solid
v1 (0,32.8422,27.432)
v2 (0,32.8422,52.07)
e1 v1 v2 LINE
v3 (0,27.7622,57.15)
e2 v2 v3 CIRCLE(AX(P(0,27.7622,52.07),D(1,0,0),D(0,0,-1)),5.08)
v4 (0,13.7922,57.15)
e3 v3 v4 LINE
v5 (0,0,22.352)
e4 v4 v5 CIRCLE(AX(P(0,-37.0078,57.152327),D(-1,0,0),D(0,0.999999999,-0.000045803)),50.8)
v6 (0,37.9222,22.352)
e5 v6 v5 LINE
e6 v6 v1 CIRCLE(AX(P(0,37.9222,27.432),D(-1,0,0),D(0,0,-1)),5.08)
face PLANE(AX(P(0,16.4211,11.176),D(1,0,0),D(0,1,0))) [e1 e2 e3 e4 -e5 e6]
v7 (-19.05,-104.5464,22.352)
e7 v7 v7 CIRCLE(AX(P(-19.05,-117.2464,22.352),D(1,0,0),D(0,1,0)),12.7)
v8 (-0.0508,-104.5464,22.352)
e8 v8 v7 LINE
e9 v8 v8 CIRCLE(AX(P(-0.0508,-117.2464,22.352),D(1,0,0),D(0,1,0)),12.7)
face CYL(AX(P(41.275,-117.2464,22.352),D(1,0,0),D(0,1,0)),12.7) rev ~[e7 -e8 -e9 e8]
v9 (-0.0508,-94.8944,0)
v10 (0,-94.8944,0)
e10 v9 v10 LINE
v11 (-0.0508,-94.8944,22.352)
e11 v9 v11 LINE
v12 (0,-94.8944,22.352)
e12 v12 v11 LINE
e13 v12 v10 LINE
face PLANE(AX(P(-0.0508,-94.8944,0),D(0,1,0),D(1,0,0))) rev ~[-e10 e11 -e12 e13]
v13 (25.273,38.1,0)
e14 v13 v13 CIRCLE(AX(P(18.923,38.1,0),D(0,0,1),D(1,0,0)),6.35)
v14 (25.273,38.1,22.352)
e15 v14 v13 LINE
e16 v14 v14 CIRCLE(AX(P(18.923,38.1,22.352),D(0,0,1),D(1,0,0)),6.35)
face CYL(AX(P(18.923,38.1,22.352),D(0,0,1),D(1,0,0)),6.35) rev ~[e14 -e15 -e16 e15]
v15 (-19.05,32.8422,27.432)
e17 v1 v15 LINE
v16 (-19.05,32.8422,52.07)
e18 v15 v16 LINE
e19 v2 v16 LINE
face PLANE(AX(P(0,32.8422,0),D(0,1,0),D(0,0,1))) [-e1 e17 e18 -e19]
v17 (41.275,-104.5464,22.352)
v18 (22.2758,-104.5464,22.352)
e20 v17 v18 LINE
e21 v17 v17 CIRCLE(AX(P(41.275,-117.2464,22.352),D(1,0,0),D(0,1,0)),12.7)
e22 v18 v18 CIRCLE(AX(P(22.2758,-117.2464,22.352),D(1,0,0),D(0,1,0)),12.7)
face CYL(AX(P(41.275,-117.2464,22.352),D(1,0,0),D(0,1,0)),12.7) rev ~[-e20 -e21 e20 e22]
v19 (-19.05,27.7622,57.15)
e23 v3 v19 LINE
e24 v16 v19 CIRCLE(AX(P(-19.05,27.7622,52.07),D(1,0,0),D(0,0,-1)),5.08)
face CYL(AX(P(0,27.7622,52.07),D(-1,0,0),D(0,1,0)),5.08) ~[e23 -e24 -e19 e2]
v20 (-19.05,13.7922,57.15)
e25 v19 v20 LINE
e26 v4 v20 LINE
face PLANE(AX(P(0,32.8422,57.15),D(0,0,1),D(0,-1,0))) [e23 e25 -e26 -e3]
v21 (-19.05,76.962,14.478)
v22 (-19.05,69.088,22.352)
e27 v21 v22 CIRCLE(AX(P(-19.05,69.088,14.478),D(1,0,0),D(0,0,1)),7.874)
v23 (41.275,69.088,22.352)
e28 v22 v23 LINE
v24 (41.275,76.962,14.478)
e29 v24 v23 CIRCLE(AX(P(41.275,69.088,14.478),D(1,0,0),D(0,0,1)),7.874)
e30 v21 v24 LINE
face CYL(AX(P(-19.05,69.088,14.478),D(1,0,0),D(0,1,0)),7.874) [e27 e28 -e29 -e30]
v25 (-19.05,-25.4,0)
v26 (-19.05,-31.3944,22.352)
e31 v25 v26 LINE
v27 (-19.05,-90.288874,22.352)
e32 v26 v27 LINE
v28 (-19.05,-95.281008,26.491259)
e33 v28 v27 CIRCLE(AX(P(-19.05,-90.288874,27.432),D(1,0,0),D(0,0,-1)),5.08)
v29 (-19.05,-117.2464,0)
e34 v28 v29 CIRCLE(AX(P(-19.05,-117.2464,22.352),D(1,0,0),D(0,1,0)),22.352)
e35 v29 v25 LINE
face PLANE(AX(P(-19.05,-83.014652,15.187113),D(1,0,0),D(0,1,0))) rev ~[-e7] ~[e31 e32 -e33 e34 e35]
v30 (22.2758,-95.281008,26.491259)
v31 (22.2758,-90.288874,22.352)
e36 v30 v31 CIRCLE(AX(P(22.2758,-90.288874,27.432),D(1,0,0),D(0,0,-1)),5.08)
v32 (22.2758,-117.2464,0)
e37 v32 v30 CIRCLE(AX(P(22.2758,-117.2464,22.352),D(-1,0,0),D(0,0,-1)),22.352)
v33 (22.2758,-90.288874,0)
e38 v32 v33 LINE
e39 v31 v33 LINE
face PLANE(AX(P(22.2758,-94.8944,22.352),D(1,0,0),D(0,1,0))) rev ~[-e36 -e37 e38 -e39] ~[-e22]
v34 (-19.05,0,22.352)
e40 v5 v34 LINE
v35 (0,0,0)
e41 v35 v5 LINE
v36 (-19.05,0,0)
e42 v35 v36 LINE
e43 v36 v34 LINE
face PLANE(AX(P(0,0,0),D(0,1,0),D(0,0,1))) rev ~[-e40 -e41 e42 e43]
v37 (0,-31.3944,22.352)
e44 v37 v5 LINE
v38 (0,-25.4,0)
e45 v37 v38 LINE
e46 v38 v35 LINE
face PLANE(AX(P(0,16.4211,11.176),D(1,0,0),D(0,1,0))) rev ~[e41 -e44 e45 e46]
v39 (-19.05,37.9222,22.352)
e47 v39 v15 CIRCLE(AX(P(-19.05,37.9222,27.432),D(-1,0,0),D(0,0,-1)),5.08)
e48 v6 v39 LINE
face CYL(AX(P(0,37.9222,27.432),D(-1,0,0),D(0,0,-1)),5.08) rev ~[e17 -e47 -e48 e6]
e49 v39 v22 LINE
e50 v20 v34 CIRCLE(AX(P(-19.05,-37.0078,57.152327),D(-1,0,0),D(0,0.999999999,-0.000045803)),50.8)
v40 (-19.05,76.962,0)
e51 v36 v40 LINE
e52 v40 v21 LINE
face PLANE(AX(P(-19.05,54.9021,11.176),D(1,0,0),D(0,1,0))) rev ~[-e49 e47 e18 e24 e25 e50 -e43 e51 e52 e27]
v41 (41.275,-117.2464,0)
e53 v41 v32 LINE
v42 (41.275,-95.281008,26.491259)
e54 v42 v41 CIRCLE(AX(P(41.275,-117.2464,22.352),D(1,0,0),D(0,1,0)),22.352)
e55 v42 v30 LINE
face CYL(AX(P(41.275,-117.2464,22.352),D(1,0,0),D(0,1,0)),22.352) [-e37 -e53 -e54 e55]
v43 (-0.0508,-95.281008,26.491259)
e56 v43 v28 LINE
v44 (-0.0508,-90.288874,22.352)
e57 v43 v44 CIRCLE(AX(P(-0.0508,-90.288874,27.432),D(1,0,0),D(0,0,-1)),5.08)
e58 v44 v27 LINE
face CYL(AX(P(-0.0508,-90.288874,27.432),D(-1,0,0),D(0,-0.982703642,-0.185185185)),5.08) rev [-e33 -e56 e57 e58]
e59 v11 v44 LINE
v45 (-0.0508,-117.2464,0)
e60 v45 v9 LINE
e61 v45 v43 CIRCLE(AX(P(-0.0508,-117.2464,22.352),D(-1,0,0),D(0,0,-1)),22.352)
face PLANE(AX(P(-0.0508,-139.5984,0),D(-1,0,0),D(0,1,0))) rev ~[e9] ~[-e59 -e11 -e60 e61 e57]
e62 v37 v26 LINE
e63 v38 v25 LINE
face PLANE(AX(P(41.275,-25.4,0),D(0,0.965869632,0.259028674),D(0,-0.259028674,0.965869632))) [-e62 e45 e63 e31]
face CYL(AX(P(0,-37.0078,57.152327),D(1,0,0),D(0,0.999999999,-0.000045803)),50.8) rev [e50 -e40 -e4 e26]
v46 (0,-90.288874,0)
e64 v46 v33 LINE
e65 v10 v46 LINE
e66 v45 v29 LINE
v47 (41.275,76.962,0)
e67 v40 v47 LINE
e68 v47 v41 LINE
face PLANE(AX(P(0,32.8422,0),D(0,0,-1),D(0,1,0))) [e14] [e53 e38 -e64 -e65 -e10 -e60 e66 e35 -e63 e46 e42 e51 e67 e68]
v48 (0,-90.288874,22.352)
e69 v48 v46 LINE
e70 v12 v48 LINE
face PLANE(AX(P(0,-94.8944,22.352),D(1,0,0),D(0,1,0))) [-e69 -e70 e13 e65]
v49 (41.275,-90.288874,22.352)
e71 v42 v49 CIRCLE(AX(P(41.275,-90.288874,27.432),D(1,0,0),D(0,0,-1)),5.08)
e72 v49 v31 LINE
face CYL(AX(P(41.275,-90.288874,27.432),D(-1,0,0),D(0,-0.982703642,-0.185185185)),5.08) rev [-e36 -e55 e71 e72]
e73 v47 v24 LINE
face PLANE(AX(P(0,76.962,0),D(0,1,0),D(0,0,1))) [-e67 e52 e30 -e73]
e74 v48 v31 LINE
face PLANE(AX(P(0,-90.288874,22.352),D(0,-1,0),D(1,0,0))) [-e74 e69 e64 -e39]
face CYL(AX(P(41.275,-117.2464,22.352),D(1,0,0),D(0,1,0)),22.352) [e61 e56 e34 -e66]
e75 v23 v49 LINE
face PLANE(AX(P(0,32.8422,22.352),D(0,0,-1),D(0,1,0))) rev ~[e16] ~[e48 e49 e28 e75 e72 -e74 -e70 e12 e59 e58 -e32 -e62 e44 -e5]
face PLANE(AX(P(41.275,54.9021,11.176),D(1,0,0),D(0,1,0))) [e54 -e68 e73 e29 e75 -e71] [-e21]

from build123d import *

# Parameters (mm, degrees)
F0_R      = 12.7
F1_DEPTH  = 60.325
F2_DEPTH  = 41.275
F0_W      = 32.8422
F0_H      = 22.352
F4_DEPTH  = 41.275
F5_DEPTH  = 19.05
F0_W_2    = 44.1198
F6_DEPTH  = 41.275
F7_DEPTH  = 19.05
F8_W      = 22.3266
F8_H      = 44.704
F9_DEPTH  = 47.752
F10_R     = 6.35
F11_DEPTH = 22.352
F12_R     = 5.08
F13_R     = 7.874
F14_W     = 22.2758
F14_H     = 4.605526296
F15_DEPTH = 22.352


with BuildPart() as f1:
    # F0 (on Right) → F1 (new body)
    with BuildSketch(Plane.YZ):
        with BuildLine():
            ThreePointArc((-94.8944, 22.352), (-133.0516507731, 38.1572507731), (-117.2464, 0))
            Line((-117.2464, 0), (-25.4, 0))
            Line((-25.4, 0), (-31.3944, 22.352))
            Line((-31.3944, 22.352), (-94.8944, 22.352))
        make_face()
        with Locations((-117.2464, 22.352)):
            Circle(F0_R, mode=Mode.SUBTRACT)
    extrude(amount=-F1_DEPTH)

    # F0 (on Right) → F2 (join)
    with BuildSketch(Plane.YZ):
        Polygon((-31.3944, 22.352), (-25.4, 0), (0, 0), (0, 22.352), align=None)
    extrude(amount=-F2_DEPTH)


with BuildPart() as f1_1:
    # F3: moved
    add(f1.part.moved(Location((41.275, 0, 0))))

    # F0 (on Right) → F4 (join)
    with BuildSketch(Plane.YZ):
        with Locations((16.4211, 11.176)):
            Rectangle(F0_W, F0_H)
    extrude(amount=F4_DEPTH)

    # F0 (on Right) → F5 (join)
    with BuildSketch(Plane.YZ):
        with Locations((16.4211, 11.176)):
            Rectangle(F0_W, F0_H)
        with BuildLine():
            ThreePointArc((13.7922, 57.15), (10.2180153616, 38.4343576341), (0, 22.352))
            Line((0, 22.352), (32.8422, 22.352))
            Line((32.8422, 22.352), (32.8422, 57.15))
            Line((32.8422, 57.15), (13.7922, 57.15))
        make_face()
    extrude(amount=-F5_DEPTH)

    # F0 (on Right) → F6 (join)
    with BuildSketch(Plane.YZ):
        with Locations((54.9021, 11.176)):
            Rectangle(F0_W_2, F0_H)
    extrude(amount=F6_DEPTH)

    # F0 (on Right) → F7 (join)
    with BuildSketch(Plane.YZ):
        with Locations((54.9021, 11.176)):
            Rectangle(F0_W_2, F0_H)
    extrude(amount=-F7_DEPTH)

    # F8 (on Top) → F9 (cut)
    with BuildSketch(Plane.XY):
        with Locations((11.1125, -117.2464)):
            Rectangle(F8_W, F8_H)
    extrude(amount=F9_DEPTH, mode=Mode.SUBTRACT)

    # F10 (on face) → F11 (cut)
    with BuildSketch(Plane.XY.offset(22.352)):
        with Locations((18.923, 38.1)):
            Circle(F10_R)
    extrude(amount=-F11_DEPTH, mode=Mode.SUBTRACT)

    # F12
    f12_edges = [f1_1.edges().sort_by_distance(p)[0] for p in [
        (-9.525, 32.8422, 57.15),
        (-9.525, 32.8422, 22.352),
        (-9.5504, -94.8944, 22.352),
        (31.7754, -94.8944, 22.352),
    ]]
    fillet(f12_edges, radius=F12_R)

    # F13
    f13_edges = [f1_1.edges().sort_by_distance(p)[0] for p in [
        (11.1125, 76.962, 22.352),
    ]]
    fillet(f13_edges, radius=F13_R)

    # F14 (on face) → F15 (cut)
    with BuildSketch(Plane.XY.offset(22.352)):
        with Locations((11.1379, -92.591636852)):
            Rectangle(F14_W, F14_H)
    extrude(amount=-F15_DEPTH, mode=Mode.SUBTRACT)


solid = f1_1.part
